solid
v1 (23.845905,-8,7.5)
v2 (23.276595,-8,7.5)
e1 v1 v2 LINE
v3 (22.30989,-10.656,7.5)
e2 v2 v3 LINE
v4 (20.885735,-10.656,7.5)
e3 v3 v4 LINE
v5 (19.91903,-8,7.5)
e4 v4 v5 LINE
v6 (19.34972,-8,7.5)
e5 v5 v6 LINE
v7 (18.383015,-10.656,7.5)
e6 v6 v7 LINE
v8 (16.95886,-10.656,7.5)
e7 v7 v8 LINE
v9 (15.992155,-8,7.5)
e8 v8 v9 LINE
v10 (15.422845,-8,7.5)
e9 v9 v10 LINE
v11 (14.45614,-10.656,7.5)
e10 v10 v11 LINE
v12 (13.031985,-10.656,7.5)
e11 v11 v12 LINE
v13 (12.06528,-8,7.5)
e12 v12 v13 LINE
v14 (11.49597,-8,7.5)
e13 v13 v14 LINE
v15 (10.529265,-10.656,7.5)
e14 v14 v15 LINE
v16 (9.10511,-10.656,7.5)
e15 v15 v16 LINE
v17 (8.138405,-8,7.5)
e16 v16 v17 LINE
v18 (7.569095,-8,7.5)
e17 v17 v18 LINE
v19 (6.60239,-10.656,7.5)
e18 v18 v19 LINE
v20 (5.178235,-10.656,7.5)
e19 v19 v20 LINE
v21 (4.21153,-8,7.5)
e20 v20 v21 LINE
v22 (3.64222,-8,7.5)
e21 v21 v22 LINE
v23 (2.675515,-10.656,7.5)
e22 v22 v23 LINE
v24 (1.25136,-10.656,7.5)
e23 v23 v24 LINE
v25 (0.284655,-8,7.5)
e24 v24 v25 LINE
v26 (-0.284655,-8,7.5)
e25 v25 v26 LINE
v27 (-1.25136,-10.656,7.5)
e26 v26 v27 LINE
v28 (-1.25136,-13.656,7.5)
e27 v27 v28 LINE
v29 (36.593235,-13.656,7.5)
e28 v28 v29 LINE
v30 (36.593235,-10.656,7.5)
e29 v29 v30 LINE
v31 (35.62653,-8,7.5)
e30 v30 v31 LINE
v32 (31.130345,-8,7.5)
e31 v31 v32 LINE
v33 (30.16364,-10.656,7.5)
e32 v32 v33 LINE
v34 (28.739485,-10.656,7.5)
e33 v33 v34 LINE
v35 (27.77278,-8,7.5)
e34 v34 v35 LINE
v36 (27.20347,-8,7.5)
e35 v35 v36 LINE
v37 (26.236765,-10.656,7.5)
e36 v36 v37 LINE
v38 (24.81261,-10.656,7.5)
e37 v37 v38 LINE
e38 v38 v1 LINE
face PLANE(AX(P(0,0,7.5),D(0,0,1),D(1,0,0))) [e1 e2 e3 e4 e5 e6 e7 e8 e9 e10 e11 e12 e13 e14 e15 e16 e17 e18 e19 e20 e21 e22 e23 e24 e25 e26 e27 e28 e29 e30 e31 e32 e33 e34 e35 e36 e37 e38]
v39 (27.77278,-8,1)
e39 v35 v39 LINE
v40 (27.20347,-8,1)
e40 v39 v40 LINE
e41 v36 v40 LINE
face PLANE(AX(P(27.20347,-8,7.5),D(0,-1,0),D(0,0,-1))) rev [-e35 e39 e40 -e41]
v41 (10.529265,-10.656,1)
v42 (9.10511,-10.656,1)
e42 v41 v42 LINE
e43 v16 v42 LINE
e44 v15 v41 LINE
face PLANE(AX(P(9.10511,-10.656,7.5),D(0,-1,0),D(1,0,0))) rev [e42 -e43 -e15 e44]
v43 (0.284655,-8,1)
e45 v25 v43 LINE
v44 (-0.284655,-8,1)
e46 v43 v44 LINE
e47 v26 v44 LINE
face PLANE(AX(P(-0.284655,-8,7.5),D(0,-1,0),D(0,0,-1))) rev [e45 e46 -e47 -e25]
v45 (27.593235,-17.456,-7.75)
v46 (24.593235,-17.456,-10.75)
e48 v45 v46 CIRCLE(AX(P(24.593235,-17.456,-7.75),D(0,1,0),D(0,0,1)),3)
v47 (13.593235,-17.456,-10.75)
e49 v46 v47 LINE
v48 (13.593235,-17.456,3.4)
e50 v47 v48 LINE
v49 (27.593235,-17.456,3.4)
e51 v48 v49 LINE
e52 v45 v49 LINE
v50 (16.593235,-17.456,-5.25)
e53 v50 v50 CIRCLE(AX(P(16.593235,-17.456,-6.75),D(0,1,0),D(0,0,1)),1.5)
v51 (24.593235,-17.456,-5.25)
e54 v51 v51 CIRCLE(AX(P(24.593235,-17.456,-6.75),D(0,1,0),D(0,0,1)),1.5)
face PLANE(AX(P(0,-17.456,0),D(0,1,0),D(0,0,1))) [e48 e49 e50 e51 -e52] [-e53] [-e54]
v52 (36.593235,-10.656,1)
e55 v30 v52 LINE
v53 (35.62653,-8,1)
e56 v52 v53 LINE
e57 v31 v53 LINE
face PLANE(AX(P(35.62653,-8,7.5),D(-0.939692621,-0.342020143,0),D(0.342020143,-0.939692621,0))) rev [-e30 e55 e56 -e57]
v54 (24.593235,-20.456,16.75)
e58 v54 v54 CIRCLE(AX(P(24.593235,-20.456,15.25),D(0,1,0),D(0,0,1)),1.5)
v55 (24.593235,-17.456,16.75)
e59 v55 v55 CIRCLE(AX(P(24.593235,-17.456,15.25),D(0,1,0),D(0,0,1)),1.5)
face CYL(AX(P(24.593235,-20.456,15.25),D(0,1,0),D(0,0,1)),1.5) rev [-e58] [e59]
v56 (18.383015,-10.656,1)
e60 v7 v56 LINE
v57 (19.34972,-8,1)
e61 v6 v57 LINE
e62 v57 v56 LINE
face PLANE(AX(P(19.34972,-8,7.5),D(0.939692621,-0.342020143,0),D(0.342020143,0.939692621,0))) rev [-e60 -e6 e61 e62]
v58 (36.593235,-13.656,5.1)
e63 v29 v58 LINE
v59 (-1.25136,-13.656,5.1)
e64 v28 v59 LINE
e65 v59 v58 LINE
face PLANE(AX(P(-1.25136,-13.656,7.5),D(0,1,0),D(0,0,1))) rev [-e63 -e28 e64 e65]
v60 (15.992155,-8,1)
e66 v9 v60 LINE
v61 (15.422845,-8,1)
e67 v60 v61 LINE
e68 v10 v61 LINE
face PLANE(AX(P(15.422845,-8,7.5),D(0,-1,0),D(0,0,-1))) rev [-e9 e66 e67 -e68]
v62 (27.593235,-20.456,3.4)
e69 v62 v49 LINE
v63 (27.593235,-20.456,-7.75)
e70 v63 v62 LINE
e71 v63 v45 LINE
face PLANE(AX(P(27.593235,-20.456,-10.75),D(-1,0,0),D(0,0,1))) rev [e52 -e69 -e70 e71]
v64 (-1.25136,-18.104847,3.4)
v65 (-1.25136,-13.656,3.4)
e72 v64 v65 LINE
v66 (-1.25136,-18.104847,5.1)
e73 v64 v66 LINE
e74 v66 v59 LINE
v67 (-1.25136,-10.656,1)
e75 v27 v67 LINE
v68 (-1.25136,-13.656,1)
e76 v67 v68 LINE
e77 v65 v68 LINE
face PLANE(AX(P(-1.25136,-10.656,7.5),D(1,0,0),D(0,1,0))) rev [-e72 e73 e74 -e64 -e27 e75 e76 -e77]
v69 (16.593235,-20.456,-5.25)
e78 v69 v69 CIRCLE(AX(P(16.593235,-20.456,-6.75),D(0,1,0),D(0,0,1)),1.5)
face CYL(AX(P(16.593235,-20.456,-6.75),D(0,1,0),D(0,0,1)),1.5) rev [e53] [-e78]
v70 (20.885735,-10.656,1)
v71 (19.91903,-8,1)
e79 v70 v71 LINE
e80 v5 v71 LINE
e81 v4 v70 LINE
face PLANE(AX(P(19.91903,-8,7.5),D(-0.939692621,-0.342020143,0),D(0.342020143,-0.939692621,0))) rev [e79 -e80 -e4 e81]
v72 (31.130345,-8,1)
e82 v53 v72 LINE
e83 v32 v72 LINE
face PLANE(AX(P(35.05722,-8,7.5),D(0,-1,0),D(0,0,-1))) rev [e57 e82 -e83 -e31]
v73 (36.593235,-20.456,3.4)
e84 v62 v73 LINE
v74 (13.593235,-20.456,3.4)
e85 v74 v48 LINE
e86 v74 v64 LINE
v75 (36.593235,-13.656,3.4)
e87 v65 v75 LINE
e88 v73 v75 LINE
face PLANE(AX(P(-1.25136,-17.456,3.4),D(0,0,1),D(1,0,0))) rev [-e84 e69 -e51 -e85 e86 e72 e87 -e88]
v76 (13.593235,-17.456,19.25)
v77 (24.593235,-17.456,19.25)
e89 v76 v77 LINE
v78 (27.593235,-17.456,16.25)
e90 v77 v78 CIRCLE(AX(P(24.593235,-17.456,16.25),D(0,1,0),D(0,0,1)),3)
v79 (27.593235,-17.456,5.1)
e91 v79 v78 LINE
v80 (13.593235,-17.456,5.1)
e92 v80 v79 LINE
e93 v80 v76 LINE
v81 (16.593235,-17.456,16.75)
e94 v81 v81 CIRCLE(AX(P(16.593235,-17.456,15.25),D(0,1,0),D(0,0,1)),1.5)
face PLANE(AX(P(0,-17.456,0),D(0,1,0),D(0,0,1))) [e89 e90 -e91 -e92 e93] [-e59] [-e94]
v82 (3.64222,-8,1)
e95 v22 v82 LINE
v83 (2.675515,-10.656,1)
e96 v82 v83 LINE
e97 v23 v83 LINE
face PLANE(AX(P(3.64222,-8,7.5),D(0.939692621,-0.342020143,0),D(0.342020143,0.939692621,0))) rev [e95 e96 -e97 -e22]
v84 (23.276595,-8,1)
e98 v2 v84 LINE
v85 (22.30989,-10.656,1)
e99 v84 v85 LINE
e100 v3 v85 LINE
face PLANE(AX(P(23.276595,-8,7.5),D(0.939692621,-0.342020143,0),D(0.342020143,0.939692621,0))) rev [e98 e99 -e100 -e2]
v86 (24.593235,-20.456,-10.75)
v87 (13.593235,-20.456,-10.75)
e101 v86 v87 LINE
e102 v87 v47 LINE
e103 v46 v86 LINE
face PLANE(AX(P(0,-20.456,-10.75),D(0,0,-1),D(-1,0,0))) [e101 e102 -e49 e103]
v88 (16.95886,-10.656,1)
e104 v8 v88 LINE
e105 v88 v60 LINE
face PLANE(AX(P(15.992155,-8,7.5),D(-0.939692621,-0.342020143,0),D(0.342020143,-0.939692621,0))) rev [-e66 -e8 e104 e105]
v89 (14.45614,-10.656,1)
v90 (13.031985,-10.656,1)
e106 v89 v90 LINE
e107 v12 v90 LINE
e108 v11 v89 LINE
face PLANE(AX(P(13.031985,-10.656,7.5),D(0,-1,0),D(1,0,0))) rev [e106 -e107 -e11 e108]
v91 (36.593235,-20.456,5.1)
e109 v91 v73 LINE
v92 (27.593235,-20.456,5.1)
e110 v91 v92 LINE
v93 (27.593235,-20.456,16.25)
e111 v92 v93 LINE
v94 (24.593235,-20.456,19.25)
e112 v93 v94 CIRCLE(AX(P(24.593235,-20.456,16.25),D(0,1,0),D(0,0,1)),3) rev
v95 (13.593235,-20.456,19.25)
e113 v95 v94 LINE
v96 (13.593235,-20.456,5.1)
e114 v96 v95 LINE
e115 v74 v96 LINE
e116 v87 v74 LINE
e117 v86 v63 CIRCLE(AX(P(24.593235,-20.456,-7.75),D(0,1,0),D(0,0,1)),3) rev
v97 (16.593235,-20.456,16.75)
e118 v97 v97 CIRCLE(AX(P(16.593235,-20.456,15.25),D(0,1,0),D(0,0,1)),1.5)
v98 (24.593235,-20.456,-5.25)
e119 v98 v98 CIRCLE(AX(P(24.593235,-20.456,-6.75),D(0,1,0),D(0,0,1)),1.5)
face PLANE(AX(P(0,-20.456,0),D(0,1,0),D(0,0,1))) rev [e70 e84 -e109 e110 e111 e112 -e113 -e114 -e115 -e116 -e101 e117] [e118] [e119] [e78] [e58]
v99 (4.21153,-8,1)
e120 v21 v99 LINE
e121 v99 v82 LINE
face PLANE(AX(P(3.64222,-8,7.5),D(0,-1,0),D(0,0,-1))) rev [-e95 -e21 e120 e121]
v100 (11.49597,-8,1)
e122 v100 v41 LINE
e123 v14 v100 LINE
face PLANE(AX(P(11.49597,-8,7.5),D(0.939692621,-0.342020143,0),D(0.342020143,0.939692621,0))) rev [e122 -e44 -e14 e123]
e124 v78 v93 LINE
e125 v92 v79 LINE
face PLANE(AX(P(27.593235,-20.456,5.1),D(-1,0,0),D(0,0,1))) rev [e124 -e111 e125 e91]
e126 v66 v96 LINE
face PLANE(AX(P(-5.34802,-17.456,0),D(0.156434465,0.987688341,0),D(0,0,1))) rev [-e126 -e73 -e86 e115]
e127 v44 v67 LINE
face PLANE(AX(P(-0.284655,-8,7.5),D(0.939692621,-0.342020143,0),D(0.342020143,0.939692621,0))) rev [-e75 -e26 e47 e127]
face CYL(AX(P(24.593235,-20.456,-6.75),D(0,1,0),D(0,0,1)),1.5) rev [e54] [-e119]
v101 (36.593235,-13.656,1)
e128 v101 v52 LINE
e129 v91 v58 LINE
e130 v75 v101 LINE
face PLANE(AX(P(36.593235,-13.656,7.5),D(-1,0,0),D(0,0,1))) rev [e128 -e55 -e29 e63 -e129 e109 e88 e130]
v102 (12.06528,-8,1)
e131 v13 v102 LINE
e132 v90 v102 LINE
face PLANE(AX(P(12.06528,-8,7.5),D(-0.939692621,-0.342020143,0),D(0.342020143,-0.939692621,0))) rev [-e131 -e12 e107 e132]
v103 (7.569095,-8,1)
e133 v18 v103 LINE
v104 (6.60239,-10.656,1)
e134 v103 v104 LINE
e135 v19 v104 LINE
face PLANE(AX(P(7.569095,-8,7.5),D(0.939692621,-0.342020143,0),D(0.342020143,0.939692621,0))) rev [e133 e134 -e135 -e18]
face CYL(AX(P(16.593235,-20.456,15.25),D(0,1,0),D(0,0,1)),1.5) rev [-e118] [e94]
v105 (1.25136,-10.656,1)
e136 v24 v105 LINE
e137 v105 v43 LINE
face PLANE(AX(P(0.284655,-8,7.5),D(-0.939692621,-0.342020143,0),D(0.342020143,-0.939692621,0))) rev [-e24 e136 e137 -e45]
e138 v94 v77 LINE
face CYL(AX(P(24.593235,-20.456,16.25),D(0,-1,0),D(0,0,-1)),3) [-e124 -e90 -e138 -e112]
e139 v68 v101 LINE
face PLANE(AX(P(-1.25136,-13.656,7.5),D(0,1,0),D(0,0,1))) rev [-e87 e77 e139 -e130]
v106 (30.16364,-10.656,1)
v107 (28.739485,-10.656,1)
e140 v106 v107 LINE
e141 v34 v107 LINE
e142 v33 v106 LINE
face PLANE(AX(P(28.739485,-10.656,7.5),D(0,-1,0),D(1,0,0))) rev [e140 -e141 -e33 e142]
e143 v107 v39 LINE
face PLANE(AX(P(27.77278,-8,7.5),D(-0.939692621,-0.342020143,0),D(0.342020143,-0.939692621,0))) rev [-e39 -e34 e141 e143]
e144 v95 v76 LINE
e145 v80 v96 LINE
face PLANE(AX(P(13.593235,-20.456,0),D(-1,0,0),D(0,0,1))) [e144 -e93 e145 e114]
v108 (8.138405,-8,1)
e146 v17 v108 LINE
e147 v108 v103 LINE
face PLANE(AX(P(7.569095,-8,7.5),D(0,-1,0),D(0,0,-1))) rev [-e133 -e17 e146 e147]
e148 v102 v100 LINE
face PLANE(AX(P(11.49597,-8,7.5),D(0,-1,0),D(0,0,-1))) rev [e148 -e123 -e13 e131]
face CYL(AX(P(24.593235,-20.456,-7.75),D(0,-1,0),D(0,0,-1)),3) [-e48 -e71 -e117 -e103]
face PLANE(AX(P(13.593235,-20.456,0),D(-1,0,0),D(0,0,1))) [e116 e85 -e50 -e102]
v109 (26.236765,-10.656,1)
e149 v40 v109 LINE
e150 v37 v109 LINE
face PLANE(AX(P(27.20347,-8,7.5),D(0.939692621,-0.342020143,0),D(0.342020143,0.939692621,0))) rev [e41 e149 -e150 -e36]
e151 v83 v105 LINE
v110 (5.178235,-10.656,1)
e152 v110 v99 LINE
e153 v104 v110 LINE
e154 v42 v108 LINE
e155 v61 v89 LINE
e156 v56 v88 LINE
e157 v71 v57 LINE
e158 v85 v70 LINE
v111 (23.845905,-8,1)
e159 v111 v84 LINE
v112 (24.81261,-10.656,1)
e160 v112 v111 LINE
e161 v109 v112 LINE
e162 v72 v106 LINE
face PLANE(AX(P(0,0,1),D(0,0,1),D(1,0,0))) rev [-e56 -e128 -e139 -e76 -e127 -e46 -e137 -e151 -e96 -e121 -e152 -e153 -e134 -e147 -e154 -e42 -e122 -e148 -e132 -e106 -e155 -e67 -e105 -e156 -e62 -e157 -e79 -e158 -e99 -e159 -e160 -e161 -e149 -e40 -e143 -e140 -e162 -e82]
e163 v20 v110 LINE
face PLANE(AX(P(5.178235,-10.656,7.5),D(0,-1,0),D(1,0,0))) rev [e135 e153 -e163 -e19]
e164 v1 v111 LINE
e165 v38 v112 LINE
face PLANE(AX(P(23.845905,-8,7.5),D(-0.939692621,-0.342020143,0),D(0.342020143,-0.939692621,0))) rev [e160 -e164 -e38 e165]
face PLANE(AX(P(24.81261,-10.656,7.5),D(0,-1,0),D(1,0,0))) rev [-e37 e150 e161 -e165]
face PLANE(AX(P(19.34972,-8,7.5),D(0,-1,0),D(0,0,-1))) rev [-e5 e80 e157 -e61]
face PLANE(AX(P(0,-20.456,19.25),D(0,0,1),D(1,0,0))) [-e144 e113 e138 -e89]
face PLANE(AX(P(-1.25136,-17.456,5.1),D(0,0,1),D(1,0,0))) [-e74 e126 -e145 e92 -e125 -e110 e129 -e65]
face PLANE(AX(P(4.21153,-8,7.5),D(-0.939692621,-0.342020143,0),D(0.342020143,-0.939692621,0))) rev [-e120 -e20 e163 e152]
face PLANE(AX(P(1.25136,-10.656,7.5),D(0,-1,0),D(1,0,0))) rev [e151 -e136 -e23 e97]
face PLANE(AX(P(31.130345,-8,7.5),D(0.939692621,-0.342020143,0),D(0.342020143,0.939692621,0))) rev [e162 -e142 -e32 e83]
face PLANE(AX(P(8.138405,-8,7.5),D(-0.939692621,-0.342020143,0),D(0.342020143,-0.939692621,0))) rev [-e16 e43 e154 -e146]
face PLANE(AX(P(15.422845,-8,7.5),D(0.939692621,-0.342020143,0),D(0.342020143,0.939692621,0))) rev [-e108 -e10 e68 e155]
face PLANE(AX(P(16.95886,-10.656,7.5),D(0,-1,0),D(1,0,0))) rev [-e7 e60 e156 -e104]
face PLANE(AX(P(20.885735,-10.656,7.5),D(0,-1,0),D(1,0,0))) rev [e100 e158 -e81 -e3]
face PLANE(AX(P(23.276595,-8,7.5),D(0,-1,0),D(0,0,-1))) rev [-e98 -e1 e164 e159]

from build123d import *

# Parameters (mm, degrees)
ESQUISSE1_R             = 2.5
BOSS_EXTRU_1_DEPTH      = 1
BOSS_EXTRU_2_DEPTH      = 6.5
ESQUISSE3_R             = 14.137419556
ENL_V_MAT_EXTRU_1_DEPTH = 1
ESQUISSE4_W             = 37.844594902
ESQUISSE4_H             = 1.7
BOSS_EXTRU_3_DEPTH      = 3.8
BOSS_EXTRU_4_START      = -17.456
ESQUISSE5_W             = 20
ESQUISSE5_H             = 30
BOSS_EXTRU_4_DEPTH      = 3
BOSS_EXTRU_5_START      = -17.456
ESQUISSE7_W             = 3
ESQUISSE7_H             = 30
BOSS_EXTRU_5_DEPTH      = 3
CHANFREIN1_SIZE         = 3
CHANFREIN1_SIZE_2       = 18.941254544
ESQUISSE6_R             = 1.5
ENL_V_MAT_EXTRU_2_DEPTH = 47.131066324
BOSS_EXTRU_6_START      = 1
BOSS_EXTRU_6_DEPTH      = 6.5
ESQUISSE9_W             = 9
ESQUISSE9_H             = 14.15
ENL_V_MAT_EXTRU_3_DEPTH = 43.415130321
CONG_2_R                = 3


with BuildPart() as part:
    # Esquisse1 → Boss.-Extru.1 (new body)
    with BuildSketch(Plane.XY):
        with BuildLine():
            ThreePointArc((-2.797532396, 7.349311298), (-3.009326841, 7.265157674), (-3.218593728, 7.174901984))
            ThreePointArc((-3.218593728, 7.174901984), (-3.518823735, 7.161602241), (-3.746621491, 7.357620412))
            ThreePointArc((-3.746621491, 7.357620412), (-4.480939546, 8.300763177), (-5.498824516, 8.927382256))
            ThreePointArc((-5.498824516, 8.927382256), (-5.825153893, 8.717958885), (-6.143516706, 8.496612707))
            ThreePointArc((-6.143516706, 8.496612707), (-5.954123878, 7.316412877), (-5.363784935, 6.277066345))
            ThreePointArc((-5.363784935, 6.277066345), (-5.269862186, 5.991595754), (-5.397042596, 5.719308987))
            ThreePointArc((-5.397042596, 5.719308987), (-5.560510951, 5.560510951), (-5.719308987, 5.397042596))
            ThreePointArc((-5.719308987, 5.397042596), (-5.991595754, 5.269862186), (-6.277066345, 5.363784935))
            ThreePointArc((-6.277066345, 5.363784935), (-7.316412877, 5.954123878), (-8.496612707, 6.143516706))
            ThreePointArc((-8.496612707, 6.143516706), (-8.717958885, 5.825153893), (-8.927382256, 5.498824516))
            ThreePointArc((-8.927382256, 5.498824516), (-8.300763177, 4.480939546), (-7.357620412, 3.746621491))
            ThreePointArc((-7.357620412, 3.746621491), (-7.161602241, 3.518823735), (-7.174901984, 3.218593728))
            ThreePointArc((-7.174901984, 3.218593728), (-7.265157674, 3.009326841), (-7.349311298, 2.797532396))
            ThreePointArc((-7.349311298, 2.797532396), (-7.552201634, 2.575833384), (-7.851884749, 2.553361824))
            ThreePointArc((-7.851884749, 2.553361824), (-9.038028671, 2.701023192), (-10.200868635, 2.424356428))
            ThreePointArc((-10.200868635, 2.424356428), (-10.283533665, 2.045522026), (-10.352134785, 1.663890139))
            ThreePointArc((-10.352134785, 1.663890139), (-9.383686529, 0.963283789), (-8.231324879, 0.645787478))
            ThreePointArc((-8.231324879, 0.645787478), (-7.963053276, 0.510342701), (-7.860447586, 0.22787675))
            ThreePointArc((-7.860447586, 0.22787675), (-7.86375, 0), (-7.860447586, -0.22787675))
            ThreePointArc((-7.860447586, -0.22787675), (-7.963053276, -0.510342701), (-8.231324879, -0.645787478))
            ThreePointArc((-8.231324879, -0.645787478), (-9.383686529, -0.963283789), (-10.352134785, -1.663890139))
            ThreePointArc((-10.352134785, -1.663890139), (-10.283533665, -2.045522026), (-10.200868635, -2.424356428))
            ThreePointArc((-10.200868635, -2.424356428), (-9.038028671, -2.701023192), (-7.851884749, -2.553361824))
            ThreePointArc((-7.851884749, -2.553361824), (-7.552201634, -2.575833384), (-7.349311298, -2.797532396))
            ThreePointArc((-7.349311298, -2.797532396), (-7.265157674, -3.009326841), (-7.174901984, -3.218593728))
            ThreePointArc((-7.174901984, -3.218593728), (-7.161602241, -3.518823735), (-7.357620412, -3.746621491))
            ThreePointArc((-7.357620412, -3.746621491), (-8.300763177, -4.480939546), (-8.927382256, -5.498824516))
            ThreePointArc((-8.927382256, -5.498824516), (-8.717958885, -5.825153893), (-8.496612707, -6.143516706))
            ThreePointArc((-8.496612707, -6.143516706), (-7.316412877, -5.954123878), (-6.277066345, -5.363784935))
            ThreePointArc((-6.277066345, -5.363784935), (-5.991595754, -5.269862186), (-5.719308987, -5.397042596))
            ThreePointArc((-5.719308987, -5.397042596), (-5.560510951, -5.560510951), (-5.397042596, -5.719308987))
            ThreePointArc((-5.397042596, -5.719308987), (-5.269862186, -5.991595754), (-5.363784935, -6.277066345))
            ThreePointArc((-5.363784935, -6.277066345), (-5.954123878, -7.316412877), (-6.143516706, -8.496612707))
            ThreePointArc((-6.143516706, -8.496612707), (-5.825153893, -8.717958885), (-5.498824516, -8.927382256))
            ThreePointArc((-5.498824516, -8.927382256), (-4.480939546, -8.300763177), (-3.746621491, -7.357620412))
            ThreePointArc((-3.746621491, -7.357620412), (-3.518823735, -7.161602241), (-3.218593728, -7.174901984))
            ThreePointArc((-3.218593728, -7.174901984), (-3.009326841, -7.265157674), (-2.797532396, -7.349311298))
            ThreePointArc((-2.797532396, -7.349311298), (-2.575833384, -7.552201634), (-2.553361824, -7.851884749))
            ThreePointArc((-2.553361824, -7.851884749), (-2.701023192, -9.038028671), (-2.424356428, -10.200868635))
            ThreePointArc((-2.424356428, -10.200868635), (-2.045522026, -10.283533665), (-1.663890139, -10.352134785))
            ThreePointArc((-1.663890139, -10.352134785), (-0.963283789, -9.383686529), (-0.645787478, -8.231324879))
            ThreePointArc((-0.645787478, -8.231324879), (-0.510342701, -7.963053276), (-0.22787675, -7.860447586))
            ThreePointArc((-0.22787675, -7.860447586), (0, -7.86375), (0.22787675, -7.860447586))
            ThreePointArc((0.22787675, -7.860447586), (0.510342701, -7.963053276), (0.645787478, -8.231324879))
            ThreePointArc((0.645787478, -8.231324879), (0.963283789, -9.383686529), (1.663890139, -10.352134785))
            ThreePointArc((1.663890139, -10.352134785), (2.045522026, -10.283533665), (2.424356428, -10.200868635))
            ThreePointArc((2.424356428, -10.200868635), (2.701023192, -9.038028671), (2.553361824, -7.851884749))
            ThreePointArc((2.553361824, -7.851884749), (2.575833384, -7.552201634), (2.797532396, -7.349311298))
            ThreePointArc((2.797532396, -7.349311298), (3.009326841, -7.265157674), (3.218593728, -7.174901984))
            ThreePointArc((3.218593728, -7.174901984), (3.518823735, -7.161602241), (3.746621491, -7.357620412))
            ThreePointArc((3.746621491, -7.357620412), (4.480939546, -8.300763177), (5.498824516, -8.927382256))
            ThreePointArc((5.498824516, -8.927382256), (5.825153893, -8.717958885), (6.143516706, -8.496612707))
            ThreePointArc((6.143516706, -8.496612707), (5.954123878, -7.316412877), (5.363784935, -6.277066345))
            ThreePointArc((5.363784935, -6.277066345), (5.269862186, -5.991595754), (5.397042596, -5.719308987))
            ThreePointArc((5.397042596, -5.719308987), (5.560510951, -5.560510951), (5.719308987, -5.397042596))
            ThreePointArc((5.719308987, -5.397042596), (5.991595754, -5.269862186), (6.277066345, -5.363784935))
            ThreePointArc((6.277066345, -5.363784935), (7.316412877, -5.954123878), (8.496612707, -6.143516706))
            ThreePointArc((8.496612707, -6.143516706), (8.717958885, -5.825153893), (8.927382256, -5.498824516))
            ThreePointArc((8.927382256, -5.498824516), (8.300763177, -4.480939546), (7.357620412, -3.746621491))
            ThreePointArc((7.357620412, -3.746621491), (7.161602241, -3.518823735), (7.174901984, -3.218593728))
            ThreePointArc((7.174901984, -3.218593728), (7.265157674, -3.009326841), (7.349311298, -2.797532396))
            ThreePointArc((7.349311298, -2.797532396), (7.552201634, -2.575833384), (7.851884749, -2.553361824))
            ThreePointArc((7.851884749, -2.553361824), (9.038028671, -2.701023192), (10.200868635, -2.424356428))
            ThreePointArc((10.200868635, -2.424356428), (10.283533665, -2.045522026), (10.352134785, -1.663890139))
            ThreePointArc((10.352134785, -1.663890139), (9.383686529, -0.963283789), (8.231324879, -0.645787478))
            ThreePointArc((8.231324879, -0.645787478), (7.963053276, -0.510342701), (7.860447586, -0.22787675))
            ThreePointArc((7.860447586, -0.22787675), (7.86375, 0), (7.860447586, 0.22787675))
            ThreePointArc((7.860447586, 0.22787675), (7.963053276, 0.510342701), (8.231324879, 0.645787478))
            ThreePointArc((8.231324879, 0.645787478), (9.383686529, 0.963283789), (10.352134785, 1.663890139))
            ThreePointArc((10.352134785, 1.663890139), (10.283533665, 2.045522026), (10.200868635, 2.424356428))
            ThreePointArc((10.200868635, 2.424356428), (9.038028671, 2.701023192), (7.851884749, 2.553361824))
            ThreePointArc((7.851884749, 2.553361824), (7.552201634, 2.575833384), (7.349311298, 2.797532396))
            ThreePointArc((7.349311298, 2.797532396), (7.265157674, 3.009326841), (7.174901984, 3.218593728))
            ThreePointArc((7.174901984, 3.218593728), (7.161602241, 3.518823735), (7.357620412, 3.746621491))
            ThreePointArc((7.357620412, 3.746621491), (8.300763177, 4.480939546), (8.927382256, 5.498824516))
            ThreePointArc((8.927382256, 5.498824516), (8.717958885, 5.825153893), (8.496612707, 6.143516706))
            ThreePointArc((8.496612707, 6.143516706), (7.316412877, 5.954123878), (6.277066345, 5.363784935))
            ThreePointArc((6.277066345, 5.363784935), (5.991595754, 5.269862186), (5.719308987, 5.397042596))
            ThreePointArc((5.719308987, 5.397042596), (5.560510951, 5.560510951), (5.397042596, 5.719308987))
            ThreePointArc((5.397042596, 5.719308987), (5.269862186, 5.991595754), (5.363784935, 6.277066345))
            ThreePointArc((5.363784935, 6.277066345), (5.954123878, 7.316412877), (6.143516706, 8.496612707))
            ThreePointArc((6.143516706, 8.496612707), (5.825153893, 8.717958885), (5.498824516, 8.927382256))
            ThreePointArc((5.498824516, 8.927382256), (4.480939546, 8.300763177), (3.746621491, 7.357620412))
            ThreePointArc((3.746621491, 7.357620412), (3.518823735, 7.161602241), (3.218593728, 7.174901984))
            ThreePointArc((3.218593728, 7.174901984), (3.009326841, 7.265157674), (2.797532396, 7.349311298))
            ThreePointArc((2.797532396, 7.349311298), (2.575833384, 7.552201634), (2.553361824, 7.851884749))
            ThreePointArc((2.553361824, 7.851884749), (2.701023192, 9.038028671), (2.424356428, 10.200868635))
            ThreePointArc((2.424356428, 10.200868635), (2.045522026, 10.283533665), (1.663890139, 10.352134785))
            ThreePointArc((1.663890139, 10.352134785), (0.963283789, 9.383686529), (0.645787478, 8.231324879))
            ThreePointArc((0.645787478, 8.231324879), (0.510342701, 7.963053276), (0.22787675, 7.860447586))
            ThreePointArc((0.22787675, 7.860447586), (0, 7.86375), (-0.22787675, 7.860447586))
            ThreePointArc((-0.22787675, 7.860447586), (-0.510342701, 7.963053276), (-0.645787478, 8.231324879))
            ThreePointArc((-0.645787478, 8.231324879), (-0.963283789, 9.383686529), (-1.663890139, 10.352134785))
            ThreePointArc((-1.663890139, 10.352134785), (-2.045522026, 10.283533665), (-2.424356428, 10.200868635))
            ThreePointArc((-2.424356428, 10.200868635), (-2.701023192, 9.038028671), (-2.553361824, 7.851884749))
            ThreePointArc((-2.553361824, 7.851884749), (-2.575833384, 7.552201634), (-2.797532396, 7.349311298))
        make_face()
        Circle(ESQUISSE1_R, mode=Mode.SUBTRACT)
    extrude(amount=BOSS_EXTRU_1_DEPTH)

    # Esquisse2 → Boss.-Extru.2 (add)
    with BuildSketch(Plane.XY.offset(1)):
        Polygon((0.284655009, -8), (1.251359951, -10.656), (2.675515049, -10.656), (3.642219991, -8), (4.211530009, -8), (5.178234951, -10.656), (6.602390049, -10.656), (7.569094991, -8), (8.138405009, -8), (9.105109951, -10.656), (10.529265049, -10.656), (11.495969991, -8), (12.065280009, -8), (13.031984951, -10.656), (14.456140049, -10.656), (15.422844991, -8), (15.992155009, -8), (16.958859951, -10.656), (18.383015049, -10.656), (19.349719991, -8), (19.919030009, -8), (20.885734951, -10.656), (22.309890049, -10.656), (23.276594991, -8), (23.845905009, -8), (24.812609951, -10.656), (26.236765049, -10.656), (27.203469991, -8), (27.772780009, -8), (28.739484951, -10.656), (30.163640049, -10.656), (31.130344991, -8), (31.699655009, -8), (32.666359951, -10.656), (34.090515049, -10.656), (35.057219991, -8), (35.626530009, -8), (36.593234951, -10.656), (36.593234951, -13.656), (-1.251359951, -13.656), (-1.251359951, -10.656), (-0.284655009, -8), align=None)
    extrude(amount=BOSS_EXTRU_2_DEPTH)

    # Esquisse3 → Enlèv. mat.-Extru.1 (cut)
    with BuildSketch(Plane(origin=(0, 0, 0), x_dir=(-1, 0, 0), z_dir=(0, 0, -1))):
        Circle(ESQUISSE3_R)
    extrude(amount=-ENL_V_MAT_EXTRU_1_DEPTH, mode=Mode.SUBTRACT)

    # Esquisse4 → Boss.-Extru.3 (add)
    with BuildSketch(Plane.XZ.offset(13.656)):
        with Locations((17.6709375, 4.25)):
            Rectangle(ESQUISSE4_W, ESQUISSE4_H)
    extrude(amount=BOSS_EXTRU_3_DEPTH)

    # Esquisse5 → Boss.-Extru.4 (add)
    with BuildSketch(Plane(origin=(0, 0, 0), x_dir=(1, 0, 0), z_dir=(0, 1, 0)).offset(BOSS_EXTRU_4_START)):
        with Locations((26.593234951, -4.25)):
            Rectangle(ESQUISSE5_W, ESQUISSE5_H)
    extrude(amount=-BOSS_EXTRU_4_DEPTH)

    # Esquisse7 → Boss.-Extru.5 (add)
    with BuildSketch(Plane(origin=(0, 0, 0), x_dir=(1, 0, 0), z_dir=(0, 1, 0)).offset(BOSS_EXTRU_5_START)):
        with Locations((15.093234951, -4.25)):
            Rectangle(ESQUISSE7_W, ESQUISSE7_H)
    extrude(amount=-BOSS_EXTRU_5_DEPTH)

    # Chanfrein1
    # the kernel refuses this chamfer: 18.941254544, 3 mm, written as the material it adds along each edge
    with BuildSketch(Plane(origin=(13.593234951, -17.456, 3.4), x_dir=(0.23333663699196244, -0.9723960169793381, 0), z_dir=(0, 0, 1))) as chanfrein1_piece_1_section:
        Polygon((CHANFREIN1_SIZE * 0.972396016979, -CHANFREIN1_SIZE * 0.233336636992), (-CHANFREIN1_SIZE_2 * 0.233336636992, -CHANFREIN1_SIZE_2 * 0.972396016981), (0, 0), align=None)
    chanfrein1_piece_1 = extrude(amount=1.7, mode=Mode.PRIVATE)
    chanfrein1_piece_1 = split(chanfrein1_piece_1, bisect_by=Plane(origin=(-1.251359951, -18.494459875, 4.25), z_dir=(1, 0, 0)), keep=Keep.TOP, mode=Mode.PRIVATE)
    add(chanfrein1_piece_1)

    # Esquisse6 → Enlèv. mat.-Extru.2 (cut, through all)
    with BuildSketch(Plane(origin=(0, 0, 0), x_dir=(1, 0, 0), z_dir=(0, 1, 0))):
        with Locations(Location((16.593234951, 6.75, 0), (0, 0, 270))):
            Circle(ESQUISSE6_R)
        with Locations(Location((24.593234951, 6.75, 0), (0, 0, 270))):
            Circle(ESQUISSE6_R)
        with Locations(Location((24.593234951, -15.25, 0), (0, 0, 270))):
            Circle(ESQUISSE6_R)
        with Locations(Location((16.593234951, -15.25, 0), (0, 0, 270))):
            Circle(ESQUISSE6_R)
    extrude(amount=-ENL_V_MAT_EXTRU_2_DEPTH, mode=Mode.SUBTRACT)

    # Esquisse8 → Boss.-Extru.6 (add)
    with BuildSketch(Plane.XY.offset(BOSS_EXTRU_6_START)):
        Polygon((31.699655009, -8), (35.057219991, -8), (34.090515049, -10.656), (32.666359951, -10.656), align=None)
    extrude(amount=BOSS_EXTRU_6_DEPTH)

    # Esquisse9 → Enlèv. mat.-Extru.3 (cut, through all)
    with BuildSketch(Plane(origin=(0, -17.456, 0), x_dir=(1, 0, 0), z_dir=(0, 1, 0))):
        with Locations((32.093234951, 3.675)):
            Rectangle(ESQUISSE9_W, ESQUISSE9_H)
        with Locations((32.093234951, -12.175)):
            Rectangle(ESQUISSE9_W, ESQUISSE9_H)
    extrude(amount=-ENL_V_MAT_EXTRU_3_DEPTH, mode=Mode.SUBTRACT)

    # Congé2
    cong_2_edges = [part.edges().sort_by_distance(p)[0] for p in [
        (27.593234951, -18.956, -10.75),
        (27.593234951, -18.956, 19.25),
    ]]
    fillet(cong_2_edges, radius=CONG_2_R)


solid = part.part
